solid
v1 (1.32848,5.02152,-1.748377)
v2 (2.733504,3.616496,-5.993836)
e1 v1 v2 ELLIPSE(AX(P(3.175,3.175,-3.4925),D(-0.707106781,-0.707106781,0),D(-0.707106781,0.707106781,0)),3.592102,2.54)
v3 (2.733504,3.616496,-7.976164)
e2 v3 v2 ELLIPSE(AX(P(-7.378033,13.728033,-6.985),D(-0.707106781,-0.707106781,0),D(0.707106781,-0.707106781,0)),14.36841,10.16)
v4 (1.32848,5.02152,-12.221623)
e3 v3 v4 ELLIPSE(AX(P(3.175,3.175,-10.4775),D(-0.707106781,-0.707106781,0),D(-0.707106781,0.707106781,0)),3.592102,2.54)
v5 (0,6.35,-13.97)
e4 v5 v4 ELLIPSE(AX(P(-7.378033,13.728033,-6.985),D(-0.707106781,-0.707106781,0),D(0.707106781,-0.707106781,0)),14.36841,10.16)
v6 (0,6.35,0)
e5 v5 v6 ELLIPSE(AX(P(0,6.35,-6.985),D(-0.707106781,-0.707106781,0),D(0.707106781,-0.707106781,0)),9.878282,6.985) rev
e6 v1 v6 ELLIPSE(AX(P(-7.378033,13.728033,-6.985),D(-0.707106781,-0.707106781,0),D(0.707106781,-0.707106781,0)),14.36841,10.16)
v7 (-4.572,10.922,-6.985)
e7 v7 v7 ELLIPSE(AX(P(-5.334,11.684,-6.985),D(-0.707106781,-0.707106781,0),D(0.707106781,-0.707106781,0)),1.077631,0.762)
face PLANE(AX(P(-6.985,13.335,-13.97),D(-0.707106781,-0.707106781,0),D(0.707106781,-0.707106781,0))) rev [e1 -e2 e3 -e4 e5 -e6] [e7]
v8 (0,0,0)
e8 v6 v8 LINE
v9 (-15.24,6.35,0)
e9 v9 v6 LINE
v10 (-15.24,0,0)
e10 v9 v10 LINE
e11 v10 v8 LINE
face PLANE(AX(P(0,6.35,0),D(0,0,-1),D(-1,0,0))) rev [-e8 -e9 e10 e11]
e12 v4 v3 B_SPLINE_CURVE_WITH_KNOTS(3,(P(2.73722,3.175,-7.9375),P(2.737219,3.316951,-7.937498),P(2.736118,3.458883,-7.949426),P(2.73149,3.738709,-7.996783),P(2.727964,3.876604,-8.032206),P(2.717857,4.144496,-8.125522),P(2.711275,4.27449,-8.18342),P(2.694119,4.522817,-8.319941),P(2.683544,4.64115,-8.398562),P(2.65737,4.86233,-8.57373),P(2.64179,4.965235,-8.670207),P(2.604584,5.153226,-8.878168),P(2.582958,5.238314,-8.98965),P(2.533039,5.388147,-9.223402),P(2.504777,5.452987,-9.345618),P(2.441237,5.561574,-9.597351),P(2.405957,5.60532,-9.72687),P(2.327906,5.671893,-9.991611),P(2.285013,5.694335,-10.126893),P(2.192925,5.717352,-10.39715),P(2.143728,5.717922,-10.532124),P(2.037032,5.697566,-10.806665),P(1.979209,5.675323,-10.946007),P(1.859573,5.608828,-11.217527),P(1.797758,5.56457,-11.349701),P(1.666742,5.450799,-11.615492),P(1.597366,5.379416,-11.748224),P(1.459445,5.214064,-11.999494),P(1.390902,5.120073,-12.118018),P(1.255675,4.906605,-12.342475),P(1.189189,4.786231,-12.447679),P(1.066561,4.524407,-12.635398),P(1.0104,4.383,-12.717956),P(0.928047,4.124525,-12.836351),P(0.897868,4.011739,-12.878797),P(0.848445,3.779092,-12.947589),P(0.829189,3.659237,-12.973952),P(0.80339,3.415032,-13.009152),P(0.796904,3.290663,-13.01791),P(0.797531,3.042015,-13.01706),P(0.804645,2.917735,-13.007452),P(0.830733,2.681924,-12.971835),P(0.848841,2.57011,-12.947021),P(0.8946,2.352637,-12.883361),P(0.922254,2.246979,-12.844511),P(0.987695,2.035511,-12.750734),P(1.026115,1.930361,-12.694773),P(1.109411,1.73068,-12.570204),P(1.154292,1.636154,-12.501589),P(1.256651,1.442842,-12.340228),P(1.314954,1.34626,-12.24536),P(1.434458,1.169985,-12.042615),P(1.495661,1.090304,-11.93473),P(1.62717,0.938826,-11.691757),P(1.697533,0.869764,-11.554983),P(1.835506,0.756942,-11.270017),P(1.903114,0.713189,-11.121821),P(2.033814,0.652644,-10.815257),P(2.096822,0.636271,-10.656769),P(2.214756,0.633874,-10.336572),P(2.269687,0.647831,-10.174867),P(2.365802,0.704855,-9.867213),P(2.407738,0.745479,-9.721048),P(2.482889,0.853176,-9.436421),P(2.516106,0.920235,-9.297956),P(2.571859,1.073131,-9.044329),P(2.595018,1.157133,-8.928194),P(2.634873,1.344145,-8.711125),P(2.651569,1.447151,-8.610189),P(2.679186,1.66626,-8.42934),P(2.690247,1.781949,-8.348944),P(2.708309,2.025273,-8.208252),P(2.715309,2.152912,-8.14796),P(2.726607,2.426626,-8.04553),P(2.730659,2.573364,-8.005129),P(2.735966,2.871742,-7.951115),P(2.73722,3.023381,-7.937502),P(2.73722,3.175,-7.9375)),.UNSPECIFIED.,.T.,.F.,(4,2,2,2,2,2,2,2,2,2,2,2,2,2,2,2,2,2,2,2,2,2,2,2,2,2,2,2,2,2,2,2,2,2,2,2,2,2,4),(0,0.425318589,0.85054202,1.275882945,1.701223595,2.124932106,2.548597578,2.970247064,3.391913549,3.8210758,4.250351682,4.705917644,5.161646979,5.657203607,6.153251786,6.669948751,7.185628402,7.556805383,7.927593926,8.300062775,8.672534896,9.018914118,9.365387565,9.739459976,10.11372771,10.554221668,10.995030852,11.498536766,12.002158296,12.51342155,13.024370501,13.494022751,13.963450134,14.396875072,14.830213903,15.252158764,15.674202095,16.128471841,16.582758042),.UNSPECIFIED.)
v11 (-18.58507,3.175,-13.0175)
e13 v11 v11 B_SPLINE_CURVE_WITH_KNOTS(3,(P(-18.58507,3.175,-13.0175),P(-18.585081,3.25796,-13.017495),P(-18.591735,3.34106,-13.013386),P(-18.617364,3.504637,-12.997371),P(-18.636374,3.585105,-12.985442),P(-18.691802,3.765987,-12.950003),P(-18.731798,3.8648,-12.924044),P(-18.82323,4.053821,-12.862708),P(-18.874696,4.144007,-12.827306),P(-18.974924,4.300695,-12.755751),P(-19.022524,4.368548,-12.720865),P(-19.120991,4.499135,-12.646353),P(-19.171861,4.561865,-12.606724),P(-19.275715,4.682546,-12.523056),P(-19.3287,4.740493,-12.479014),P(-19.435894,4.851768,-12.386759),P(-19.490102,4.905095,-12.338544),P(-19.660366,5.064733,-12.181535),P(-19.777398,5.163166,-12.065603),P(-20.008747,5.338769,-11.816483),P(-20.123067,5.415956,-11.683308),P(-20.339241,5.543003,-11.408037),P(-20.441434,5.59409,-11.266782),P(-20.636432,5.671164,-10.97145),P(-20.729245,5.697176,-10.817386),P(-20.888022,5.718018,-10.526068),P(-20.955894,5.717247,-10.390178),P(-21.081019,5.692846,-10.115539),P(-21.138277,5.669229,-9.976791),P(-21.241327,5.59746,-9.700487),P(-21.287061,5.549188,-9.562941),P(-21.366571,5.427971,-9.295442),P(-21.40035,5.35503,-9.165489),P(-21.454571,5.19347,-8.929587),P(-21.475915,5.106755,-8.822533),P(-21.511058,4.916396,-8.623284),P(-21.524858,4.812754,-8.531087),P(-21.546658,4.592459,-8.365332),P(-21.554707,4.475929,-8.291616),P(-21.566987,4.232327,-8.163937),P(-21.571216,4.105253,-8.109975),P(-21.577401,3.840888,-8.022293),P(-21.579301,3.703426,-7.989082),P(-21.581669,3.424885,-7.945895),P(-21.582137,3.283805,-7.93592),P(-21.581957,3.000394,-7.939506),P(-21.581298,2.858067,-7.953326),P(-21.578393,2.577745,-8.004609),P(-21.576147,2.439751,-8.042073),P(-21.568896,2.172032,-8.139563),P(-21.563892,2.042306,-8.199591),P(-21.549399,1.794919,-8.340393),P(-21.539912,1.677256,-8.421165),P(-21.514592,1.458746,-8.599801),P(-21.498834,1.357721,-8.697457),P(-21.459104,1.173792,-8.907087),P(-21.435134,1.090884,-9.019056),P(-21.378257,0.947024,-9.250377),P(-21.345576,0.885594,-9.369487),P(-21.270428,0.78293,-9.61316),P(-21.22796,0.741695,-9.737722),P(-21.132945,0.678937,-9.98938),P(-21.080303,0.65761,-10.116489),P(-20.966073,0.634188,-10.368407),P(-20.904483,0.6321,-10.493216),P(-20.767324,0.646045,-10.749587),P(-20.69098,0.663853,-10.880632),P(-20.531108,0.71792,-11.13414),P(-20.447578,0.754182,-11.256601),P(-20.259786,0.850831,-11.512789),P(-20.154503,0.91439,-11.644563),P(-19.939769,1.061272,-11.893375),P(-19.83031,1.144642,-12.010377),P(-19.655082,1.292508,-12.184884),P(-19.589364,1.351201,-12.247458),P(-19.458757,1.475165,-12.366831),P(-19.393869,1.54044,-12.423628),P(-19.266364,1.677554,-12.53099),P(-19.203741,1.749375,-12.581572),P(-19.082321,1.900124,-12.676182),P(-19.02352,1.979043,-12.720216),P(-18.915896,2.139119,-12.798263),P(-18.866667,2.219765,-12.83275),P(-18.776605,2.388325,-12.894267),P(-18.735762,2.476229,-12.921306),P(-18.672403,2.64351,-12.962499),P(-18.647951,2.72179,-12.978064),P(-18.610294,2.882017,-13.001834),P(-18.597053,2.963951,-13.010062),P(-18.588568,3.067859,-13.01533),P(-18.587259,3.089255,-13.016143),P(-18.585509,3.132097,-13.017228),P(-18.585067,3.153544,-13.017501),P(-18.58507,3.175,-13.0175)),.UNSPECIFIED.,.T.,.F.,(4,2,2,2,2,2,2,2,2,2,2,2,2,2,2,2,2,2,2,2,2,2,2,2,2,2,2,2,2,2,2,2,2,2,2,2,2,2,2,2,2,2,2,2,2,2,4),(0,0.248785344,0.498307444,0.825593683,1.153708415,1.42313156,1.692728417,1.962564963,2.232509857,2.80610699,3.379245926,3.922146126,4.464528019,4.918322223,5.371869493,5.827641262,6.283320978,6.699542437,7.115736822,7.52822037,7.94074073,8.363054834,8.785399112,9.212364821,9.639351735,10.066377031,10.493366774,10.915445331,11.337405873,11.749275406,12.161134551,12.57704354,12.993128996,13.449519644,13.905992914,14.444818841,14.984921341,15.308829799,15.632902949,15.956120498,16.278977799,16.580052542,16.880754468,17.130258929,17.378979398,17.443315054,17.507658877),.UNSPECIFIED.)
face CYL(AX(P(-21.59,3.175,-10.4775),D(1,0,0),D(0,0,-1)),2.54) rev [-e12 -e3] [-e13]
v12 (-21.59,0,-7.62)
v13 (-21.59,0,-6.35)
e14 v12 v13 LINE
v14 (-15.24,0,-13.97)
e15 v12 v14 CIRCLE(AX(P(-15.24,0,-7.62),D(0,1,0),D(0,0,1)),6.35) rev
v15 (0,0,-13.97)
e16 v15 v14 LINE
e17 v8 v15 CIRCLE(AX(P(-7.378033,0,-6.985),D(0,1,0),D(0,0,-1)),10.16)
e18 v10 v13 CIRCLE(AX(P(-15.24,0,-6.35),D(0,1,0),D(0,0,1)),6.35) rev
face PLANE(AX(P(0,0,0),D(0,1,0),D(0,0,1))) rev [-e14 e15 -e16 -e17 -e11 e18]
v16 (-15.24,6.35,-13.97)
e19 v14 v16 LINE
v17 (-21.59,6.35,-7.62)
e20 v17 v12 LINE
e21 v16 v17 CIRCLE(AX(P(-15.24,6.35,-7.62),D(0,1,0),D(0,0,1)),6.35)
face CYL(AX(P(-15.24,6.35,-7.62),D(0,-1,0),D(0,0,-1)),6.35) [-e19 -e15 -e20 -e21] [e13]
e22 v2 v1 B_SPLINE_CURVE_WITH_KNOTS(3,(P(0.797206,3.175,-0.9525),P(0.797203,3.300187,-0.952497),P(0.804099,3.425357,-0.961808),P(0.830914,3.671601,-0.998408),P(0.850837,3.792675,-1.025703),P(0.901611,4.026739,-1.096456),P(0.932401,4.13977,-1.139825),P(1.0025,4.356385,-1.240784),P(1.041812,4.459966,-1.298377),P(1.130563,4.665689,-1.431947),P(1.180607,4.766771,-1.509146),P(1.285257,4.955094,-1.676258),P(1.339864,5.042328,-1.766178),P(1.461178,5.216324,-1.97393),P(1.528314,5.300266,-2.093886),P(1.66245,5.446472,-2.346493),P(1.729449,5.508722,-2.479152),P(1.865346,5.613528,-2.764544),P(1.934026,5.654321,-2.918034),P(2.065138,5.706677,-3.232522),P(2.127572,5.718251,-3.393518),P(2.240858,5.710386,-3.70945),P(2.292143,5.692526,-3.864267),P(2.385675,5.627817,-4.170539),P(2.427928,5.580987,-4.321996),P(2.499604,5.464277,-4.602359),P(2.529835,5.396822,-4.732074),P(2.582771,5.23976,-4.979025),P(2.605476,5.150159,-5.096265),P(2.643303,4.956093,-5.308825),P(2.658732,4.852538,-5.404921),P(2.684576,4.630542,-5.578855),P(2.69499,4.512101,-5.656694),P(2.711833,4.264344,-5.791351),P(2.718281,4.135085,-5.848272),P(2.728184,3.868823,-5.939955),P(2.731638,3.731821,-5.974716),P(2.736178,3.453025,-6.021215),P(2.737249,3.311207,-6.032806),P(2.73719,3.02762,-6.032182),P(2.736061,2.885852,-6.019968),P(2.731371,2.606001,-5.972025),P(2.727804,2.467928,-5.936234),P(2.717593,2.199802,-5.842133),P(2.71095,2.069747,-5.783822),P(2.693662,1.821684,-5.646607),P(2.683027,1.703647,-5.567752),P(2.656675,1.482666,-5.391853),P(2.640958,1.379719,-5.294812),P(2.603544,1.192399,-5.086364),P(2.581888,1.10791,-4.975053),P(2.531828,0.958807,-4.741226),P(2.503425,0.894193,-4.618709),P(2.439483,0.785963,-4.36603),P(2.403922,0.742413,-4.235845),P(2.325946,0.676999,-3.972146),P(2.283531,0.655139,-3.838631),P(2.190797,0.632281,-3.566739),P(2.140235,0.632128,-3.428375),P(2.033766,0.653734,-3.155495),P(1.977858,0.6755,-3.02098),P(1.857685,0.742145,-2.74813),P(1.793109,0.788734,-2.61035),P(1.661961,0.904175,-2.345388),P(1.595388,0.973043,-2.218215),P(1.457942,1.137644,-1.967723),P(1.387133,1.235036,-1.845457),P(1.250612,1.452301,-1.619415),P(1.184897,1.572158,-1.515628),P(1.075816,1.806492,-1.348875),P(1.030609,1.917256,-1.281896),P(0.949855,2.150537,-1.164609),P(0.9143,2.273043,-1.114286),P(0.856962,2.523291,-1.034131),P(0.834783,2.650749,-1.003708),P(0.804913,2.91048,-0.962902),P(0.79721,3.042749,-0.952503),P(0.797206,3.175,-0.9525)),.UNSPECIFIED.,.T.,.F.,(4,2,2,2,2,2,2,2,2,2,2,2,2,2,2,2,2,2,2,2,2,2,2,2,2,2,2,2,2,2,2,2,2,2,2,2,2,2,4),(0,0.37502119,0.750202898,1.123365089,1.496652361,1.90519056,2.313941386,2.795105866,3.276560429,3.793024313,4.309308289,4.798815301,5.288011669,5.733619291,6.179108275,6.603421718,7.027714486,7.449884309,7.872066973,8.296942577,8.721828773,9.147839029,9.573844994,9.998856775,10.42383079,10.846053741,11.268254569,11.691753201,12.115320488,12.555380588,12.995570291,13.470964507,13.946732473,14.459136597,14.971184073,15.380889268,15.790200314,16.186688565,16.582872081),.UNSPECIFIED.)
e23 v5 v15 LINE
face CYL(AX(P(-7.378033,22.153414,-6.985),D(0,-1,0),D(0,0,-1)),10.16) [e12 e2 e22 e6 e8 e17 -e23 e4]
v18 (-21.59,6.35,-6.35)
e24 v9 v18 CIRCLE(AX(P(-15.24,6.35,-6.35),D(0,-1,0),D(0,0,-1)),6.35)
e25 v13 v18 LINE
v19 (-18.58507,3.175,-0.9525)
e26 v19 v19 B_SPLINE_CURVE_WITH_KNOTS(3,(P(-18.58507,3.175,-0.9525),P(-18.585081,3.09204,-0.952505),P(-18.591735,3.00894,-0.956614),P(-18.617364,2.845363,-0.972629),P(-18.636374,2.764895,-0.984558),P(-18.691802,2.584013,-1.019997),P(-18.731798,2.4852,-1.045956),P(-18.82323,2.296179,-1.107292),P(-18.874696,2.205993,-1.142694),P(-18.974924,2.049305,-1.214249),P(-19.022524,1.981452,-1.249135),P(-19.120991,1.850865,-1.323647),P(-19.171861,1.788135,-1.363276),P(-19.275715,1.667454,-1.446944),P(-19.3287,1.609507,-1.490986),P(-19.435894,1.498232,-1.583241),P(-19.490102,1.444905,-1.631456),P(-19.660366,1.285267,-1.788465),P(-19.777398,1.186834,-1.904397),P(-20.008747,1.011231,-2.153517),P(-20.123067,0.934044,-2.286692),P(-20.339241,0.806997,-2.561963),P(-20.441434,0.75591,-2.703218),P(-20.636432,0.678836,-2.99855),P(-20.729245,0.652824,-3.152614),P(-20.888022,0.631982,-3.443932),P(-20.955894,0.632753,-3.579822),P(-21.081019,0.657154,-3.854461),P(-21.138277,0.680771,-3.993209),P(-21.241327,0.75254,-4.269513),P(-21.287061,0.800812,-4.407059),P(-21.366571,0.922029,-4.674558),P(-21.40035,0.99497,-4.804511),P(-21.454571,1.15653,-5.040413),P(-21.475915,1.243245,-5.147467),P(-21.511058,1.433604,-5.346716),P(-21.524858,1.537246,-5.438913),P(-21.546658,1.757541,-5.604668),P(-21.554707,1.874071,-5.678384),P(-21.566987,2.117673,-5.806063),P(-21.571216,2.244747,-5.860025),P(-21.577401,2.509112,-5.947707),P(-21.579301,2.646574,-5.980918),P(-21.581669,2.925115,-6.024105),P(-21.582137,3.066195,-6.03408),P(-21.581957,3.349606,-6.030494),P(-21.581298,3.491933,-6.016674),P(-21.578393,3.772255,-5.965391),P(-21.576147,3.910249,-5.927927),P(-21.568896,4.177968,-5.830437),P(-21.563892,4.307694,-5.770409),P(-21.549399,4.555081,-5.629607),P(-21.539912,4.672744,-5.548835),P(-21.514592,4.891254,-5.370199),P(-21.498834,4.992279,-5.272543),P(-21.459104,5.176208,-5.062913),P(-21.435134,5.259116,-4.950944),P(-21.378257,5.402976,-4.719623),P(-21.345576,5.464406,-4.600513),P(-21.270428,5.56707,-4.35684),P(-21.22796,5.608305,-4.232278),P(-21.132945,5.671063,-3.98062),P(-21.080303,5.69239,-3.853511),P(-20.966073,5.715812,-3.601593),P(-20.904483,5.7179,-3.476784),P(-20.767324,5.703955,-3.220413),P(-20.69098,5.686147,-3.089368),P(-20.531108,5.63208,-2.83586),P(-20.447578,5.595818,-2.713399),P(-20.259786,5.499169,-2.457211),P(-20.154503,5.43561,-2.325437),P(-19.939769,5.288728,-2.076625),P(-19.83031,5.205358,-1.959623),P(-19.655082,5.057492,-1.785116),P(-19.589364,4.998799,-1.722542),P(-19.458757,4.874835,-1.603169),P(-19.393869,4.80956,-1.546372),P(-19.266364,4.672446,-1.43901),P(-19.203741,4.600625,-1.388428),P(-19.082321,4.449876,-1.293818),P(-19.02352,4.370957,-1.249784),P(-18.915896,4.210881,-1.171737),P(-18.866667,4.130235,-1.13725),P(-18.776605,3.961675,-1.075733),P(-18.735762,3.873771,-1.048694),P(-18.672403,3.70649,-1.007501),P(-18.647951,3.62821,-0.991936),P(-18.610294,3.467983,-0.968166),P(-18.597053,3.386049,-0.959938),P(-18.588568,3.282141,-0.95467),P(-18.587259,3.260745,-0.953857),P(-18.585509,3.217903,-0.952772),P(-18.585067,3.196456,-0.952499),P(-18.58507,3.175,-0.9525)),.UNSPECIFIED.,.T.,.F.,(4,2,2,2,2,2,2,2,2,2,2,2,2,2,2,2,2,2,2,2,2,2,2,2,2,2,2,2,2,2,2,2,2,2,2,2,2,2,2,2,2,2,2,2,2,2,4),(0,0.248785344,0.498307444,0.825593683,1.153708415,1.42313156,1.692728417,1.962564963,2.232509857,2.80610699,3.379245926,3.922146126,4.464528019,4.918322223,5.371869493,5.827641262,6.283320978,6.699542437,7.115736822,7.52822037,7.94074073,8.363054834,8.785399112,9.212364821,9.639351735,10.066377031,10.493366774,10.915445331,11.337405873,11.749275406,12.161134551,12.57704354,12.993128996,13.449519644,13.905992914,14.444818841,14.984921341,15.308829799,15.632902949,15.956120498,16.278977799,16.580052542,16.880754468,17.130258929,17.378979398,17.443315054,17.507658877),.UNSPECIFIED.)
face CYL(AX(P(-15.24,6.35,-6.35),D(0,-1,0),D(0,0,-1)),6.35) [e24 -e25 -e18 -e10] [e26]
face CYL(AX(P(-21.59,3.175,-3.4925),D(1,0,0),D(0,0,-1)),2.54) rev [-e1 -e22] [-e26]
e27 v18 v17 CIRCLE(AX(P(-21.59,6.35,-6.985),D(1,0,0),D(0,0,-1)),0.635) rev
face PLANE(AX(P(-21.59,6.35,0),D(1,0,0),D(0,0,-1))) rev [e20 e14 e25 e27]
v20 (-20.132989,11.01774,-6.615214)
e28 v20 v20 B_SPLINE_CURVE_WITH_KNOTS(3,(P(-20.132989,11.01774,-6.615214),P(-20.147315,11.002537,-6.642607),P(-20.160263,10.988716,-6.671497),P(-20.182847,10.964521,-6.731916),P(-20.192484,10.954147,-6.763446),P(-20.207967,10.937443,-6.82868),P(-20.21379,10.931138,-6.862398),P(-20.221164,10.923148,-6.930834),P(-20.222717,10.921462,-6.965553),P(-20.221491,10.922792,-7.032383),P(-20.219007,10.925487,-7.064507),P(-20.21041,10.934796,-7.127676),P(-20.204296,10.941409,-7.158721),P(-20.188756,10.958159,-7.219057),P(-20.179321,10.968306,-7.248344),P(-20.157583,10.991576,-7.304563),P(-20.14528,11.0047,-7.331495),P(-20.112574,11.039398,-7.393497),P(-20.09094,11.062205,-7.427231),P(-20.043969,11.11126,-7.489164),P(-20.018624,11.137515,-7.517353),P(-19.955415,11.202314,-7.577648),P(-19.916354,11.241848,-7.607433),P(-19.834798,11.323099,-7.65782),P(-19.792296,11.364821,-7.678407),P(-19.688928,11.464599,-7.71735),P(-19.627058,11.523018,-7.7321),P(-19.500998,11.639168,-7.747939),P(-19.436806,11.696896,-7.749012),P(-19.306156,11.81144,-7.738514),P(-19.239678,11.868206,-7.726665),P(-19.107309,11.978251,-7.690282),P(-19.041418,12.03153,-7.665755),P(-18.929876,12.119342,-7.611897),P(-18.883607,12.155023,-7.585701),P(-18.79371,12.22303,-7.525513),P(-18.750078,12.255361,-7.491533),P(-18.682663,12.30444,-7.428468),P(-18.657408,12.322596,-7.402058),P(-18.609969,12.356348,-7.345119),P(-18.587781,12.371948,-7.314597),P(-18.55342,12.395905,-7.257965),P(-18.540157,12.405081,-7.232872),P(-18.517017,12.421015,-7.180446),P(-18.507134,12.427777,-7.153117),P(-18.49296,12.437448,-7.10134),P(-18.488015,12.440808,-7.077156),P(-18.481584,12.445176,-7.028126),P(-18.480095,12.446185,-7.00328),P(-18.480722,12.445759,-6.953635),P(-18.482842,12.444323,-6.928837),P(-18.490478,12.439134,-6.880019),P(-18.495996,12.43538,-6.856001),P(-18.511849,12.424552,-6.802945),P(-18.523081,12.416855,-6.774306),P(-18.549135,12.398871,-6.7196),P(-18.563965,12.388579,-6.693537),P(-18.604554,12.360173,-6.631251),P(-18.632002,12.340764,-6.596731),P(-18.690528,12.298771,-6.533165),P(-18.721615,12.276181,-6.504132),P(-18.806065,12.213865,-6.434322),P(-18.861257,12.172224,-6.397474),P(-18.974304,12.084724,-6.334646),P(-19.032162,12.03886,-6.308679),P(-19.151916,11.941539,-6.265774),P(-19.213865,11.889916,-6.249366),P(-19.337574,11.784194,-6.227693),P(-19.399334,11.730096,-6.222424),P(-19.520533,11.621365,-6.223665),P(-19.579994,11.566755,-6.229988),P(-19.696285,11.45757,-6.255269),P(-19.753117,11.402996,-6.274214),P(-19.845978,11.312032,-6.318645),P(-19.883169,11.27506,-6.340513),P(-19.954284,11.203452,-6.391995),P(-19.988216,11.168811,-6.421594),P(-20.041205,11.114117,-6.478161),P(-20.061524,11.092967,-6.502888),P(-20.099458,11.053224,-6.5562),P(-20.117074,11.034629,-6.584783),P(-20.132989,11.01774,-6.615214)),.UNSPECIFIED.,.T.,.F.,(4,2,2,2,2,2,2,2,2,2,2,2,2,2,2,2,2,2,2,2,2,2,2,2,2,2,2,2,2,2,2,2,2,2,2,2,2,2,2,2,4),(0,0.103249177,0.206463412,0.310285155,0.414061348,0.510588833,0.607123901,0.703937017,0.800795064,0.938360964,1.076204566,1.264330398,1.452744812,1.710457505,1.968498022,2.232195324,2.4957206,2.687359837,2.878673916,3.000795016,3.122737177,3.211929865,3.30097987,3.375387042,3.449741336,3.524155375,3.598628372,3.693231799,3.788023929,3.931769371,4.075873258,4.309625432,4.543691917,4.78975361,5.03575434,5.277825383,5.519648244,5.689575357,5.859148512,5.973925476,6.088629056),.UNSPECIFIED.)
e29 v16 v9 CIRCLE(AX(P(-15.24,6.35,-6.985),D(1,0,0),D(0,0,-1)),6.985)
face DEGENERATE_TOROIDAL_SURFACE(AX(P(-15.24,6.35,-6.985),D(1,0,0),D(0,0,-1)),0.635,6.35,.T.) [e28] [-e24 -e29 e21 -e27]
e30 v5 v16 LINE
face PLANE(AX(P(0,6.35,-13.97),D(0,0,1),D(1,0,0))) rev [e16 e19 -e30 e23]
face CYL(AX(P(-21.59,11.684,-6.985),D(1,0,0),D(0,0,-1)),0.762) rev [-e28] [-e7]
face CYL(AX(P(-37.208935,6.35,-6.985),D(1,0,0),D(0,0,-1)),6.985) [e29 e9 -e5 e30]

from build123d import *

# Parameters (mm, degrees)
SKETCH1_W                = 21.59
SKETCH1_H                = 13.97
DEPTH_A_DEPTH            = 6.35
ROUND_EXTRUDE_DEPTH      = 21.59
ANGLE_CUT_DEPTH          = 29.967416609
STRING_HOLE_R            = 0.762
STRING_HOLE_CUT_DEPTH    = 29.967416609
ELASTIC_HOLES_R          = 2.54
ELASTIC_HOLE_CUT_DEPTH   = 29.967416609
FILLET1_R                = 6.35
GUIDE_OUTIE_REACH        = 30.967
SKETCH7_R                = 2.54
ELASTIC_HOLE_CUT_2_DEPTH = 29.967416778


with BuildPart() as part:
    # Sketch1 → depth a (new body)
    with BuildSketch(Plane(origin=(0, 0, 0), x_dir=(1, 0, 0), z_dir=(0, 1, 0))):
        with Locations((-10.795, 6.985)):
            Rectangle(SKETCH1_W, SKETCH1_H)
    extrude(amount=DEPTH_A_DEPTH)

    # Sketch4 → round extrude (add)
    with BuildSketch(Plane(origin=(0, 0, 0), x_dir=(0, 0, -1), z_dir=(1, 0, 0))):
        with BuildLine():
            Line((0, 6.35), (13.97, 6.35))
            ThreePointArc((13.97, 6.35), (6.985, 13.335), (0, 6.35))
        make_face()
    extrude(amount=-ROUND_EXTRUDE_DEPTH)

    # Sketch5 → angle cut (cut, through all)
    with BuildSketch(Plane.XY):
        Polygon((0, 6.35), (0, 13.335), (-6.985, 13.335), align=None)
    extrude(amount=-ANGLE_CUT_DEPTH, mode=Mode.SUBTRACT)

    # string hole → string hole cut (cut, through all)
    with BuildSketch(Plane(origin=(0, 0, 0), x_dir=(0, 0, -1), z_dir=(1, 0, 0))):
        with Locations((6.985, 11.684)):
            Circle(STRING_HOLE_R)
    extrude(amount=-STRING_HOLE_CUT_DEPTH, mode=Mode.SUBTRACT)

    # elastic holes → elastic hole cut (cut, through all)
    with BuildSketch(Plane(origin=(0, 0, 0), x_dir=(0, 0, -1), z_dir=(1, 0, 0))):
        with Locations((3.4925, 3.175)):
            Circle(ELASTIC_HOLES_R)
        with Locations(Location((10.4775, 3.175, 0), (0, 0, 180))):
            Circle(ELASTIC_HOLES_R)
    extrude(amount=-ELASTIC_HOLE_CUT_DEPTH, mode=Mode.SUBTRACT)

    # Fillet1
    # the kernel refuses this fillet: 6.35 mm, written as the material it takes off along each edge
    with BuildSketch(Plane(origin=(-21.59, 6.35, -6.985), x_dir=(0, 0, -1), z_dir=(0, -1, 0))) as fillet1_piece_1:
        with BuildLine():
            CenterArc((6.985 - FILLET1_R, FILLET1_R), FILLET1_R, 270, 90)
            Line((6.985, FILLET1_R), (6.985, 0))
            Line((6.985, 0), (6.985 - FILLET1_R, 0))
        make_face()
    revolve(axis=Axis((-21.59, 6.35, -6.985), (1, 0, 0)), revolution_arc=180, mode=Mode.SUBTRACT)
    with BuildSketch(Plane(origin=(-21.59, -15.875, 0), x_dir=(1, 0, 0), z_dir=(0, 1, 0)), Plane(origin=(-21.59, -15.875, -13.97), x_dir=(0, 0, 1), z_dir=(0, 1, 0))) as fillet1_piece_2:
        with BuildLine():
            CenterArc((FILLET1_R, FILLET1_R), FILLET1_R, 180, 90)
            Line((0, FILLET1_R), (0, 0))
            Line((0, 0), (FILLET1_R, 0))
        make_face()
    extrude(amount=22.225, mode=Mode.SUBTRACT)

    # guide outie: up to this plane
    guide_outie_end = Plane(origin=(-6.985, 13.335, -13.97), z_dir=(-0.7071067811865512, -0.7071067811865439, 0))
    # guide → guide outie (add, up to the surface)
    with BuildSketch(Plane(origin=(0, 0, 0), x_dir=(1, 0, 0), z_dir=(0, 1, 0)), mode=Mode.PRIVATE) as guide_outie_sk1:
        with BuildLine():
            Line((0, 13.97), (0, 0))
            ThreePointArc((0, 0), (2.781966725, 6.985), (0, 13.97))
        make_face()
    guide_outie_tool1 = split(extrude(guide_outie_sk1.sketch, amount=GUIDE_OUTIE_REACH, mode=Mode.PRIVATE), bisect_by=guide_outie_end, keep=Keep.BOTH, mode=Mode.PRIVATE)
    add(guide_outie_tool1.solids().sort_by_distance((1.126975, 0, -6.985))[0])

    # Sketch7 → elastic hole cut 2 (cut, through all)
    with BuildSketch(Plane.ZY):
        with Locations(Location((-3.4925, 3.175, 0), (0, 0, 169.990167885))):
            Circle(SKETCH7_R)
        with Locations(Location((-10.4775, 3.175, 0), (0, 0, 180))):
            Circle(SKETCH7_R)
    extrude(amount=-ELASTIC_HOLE_CUT_2_DEPTH, mode=Mode.SUBTRACT)


solid = part.part
